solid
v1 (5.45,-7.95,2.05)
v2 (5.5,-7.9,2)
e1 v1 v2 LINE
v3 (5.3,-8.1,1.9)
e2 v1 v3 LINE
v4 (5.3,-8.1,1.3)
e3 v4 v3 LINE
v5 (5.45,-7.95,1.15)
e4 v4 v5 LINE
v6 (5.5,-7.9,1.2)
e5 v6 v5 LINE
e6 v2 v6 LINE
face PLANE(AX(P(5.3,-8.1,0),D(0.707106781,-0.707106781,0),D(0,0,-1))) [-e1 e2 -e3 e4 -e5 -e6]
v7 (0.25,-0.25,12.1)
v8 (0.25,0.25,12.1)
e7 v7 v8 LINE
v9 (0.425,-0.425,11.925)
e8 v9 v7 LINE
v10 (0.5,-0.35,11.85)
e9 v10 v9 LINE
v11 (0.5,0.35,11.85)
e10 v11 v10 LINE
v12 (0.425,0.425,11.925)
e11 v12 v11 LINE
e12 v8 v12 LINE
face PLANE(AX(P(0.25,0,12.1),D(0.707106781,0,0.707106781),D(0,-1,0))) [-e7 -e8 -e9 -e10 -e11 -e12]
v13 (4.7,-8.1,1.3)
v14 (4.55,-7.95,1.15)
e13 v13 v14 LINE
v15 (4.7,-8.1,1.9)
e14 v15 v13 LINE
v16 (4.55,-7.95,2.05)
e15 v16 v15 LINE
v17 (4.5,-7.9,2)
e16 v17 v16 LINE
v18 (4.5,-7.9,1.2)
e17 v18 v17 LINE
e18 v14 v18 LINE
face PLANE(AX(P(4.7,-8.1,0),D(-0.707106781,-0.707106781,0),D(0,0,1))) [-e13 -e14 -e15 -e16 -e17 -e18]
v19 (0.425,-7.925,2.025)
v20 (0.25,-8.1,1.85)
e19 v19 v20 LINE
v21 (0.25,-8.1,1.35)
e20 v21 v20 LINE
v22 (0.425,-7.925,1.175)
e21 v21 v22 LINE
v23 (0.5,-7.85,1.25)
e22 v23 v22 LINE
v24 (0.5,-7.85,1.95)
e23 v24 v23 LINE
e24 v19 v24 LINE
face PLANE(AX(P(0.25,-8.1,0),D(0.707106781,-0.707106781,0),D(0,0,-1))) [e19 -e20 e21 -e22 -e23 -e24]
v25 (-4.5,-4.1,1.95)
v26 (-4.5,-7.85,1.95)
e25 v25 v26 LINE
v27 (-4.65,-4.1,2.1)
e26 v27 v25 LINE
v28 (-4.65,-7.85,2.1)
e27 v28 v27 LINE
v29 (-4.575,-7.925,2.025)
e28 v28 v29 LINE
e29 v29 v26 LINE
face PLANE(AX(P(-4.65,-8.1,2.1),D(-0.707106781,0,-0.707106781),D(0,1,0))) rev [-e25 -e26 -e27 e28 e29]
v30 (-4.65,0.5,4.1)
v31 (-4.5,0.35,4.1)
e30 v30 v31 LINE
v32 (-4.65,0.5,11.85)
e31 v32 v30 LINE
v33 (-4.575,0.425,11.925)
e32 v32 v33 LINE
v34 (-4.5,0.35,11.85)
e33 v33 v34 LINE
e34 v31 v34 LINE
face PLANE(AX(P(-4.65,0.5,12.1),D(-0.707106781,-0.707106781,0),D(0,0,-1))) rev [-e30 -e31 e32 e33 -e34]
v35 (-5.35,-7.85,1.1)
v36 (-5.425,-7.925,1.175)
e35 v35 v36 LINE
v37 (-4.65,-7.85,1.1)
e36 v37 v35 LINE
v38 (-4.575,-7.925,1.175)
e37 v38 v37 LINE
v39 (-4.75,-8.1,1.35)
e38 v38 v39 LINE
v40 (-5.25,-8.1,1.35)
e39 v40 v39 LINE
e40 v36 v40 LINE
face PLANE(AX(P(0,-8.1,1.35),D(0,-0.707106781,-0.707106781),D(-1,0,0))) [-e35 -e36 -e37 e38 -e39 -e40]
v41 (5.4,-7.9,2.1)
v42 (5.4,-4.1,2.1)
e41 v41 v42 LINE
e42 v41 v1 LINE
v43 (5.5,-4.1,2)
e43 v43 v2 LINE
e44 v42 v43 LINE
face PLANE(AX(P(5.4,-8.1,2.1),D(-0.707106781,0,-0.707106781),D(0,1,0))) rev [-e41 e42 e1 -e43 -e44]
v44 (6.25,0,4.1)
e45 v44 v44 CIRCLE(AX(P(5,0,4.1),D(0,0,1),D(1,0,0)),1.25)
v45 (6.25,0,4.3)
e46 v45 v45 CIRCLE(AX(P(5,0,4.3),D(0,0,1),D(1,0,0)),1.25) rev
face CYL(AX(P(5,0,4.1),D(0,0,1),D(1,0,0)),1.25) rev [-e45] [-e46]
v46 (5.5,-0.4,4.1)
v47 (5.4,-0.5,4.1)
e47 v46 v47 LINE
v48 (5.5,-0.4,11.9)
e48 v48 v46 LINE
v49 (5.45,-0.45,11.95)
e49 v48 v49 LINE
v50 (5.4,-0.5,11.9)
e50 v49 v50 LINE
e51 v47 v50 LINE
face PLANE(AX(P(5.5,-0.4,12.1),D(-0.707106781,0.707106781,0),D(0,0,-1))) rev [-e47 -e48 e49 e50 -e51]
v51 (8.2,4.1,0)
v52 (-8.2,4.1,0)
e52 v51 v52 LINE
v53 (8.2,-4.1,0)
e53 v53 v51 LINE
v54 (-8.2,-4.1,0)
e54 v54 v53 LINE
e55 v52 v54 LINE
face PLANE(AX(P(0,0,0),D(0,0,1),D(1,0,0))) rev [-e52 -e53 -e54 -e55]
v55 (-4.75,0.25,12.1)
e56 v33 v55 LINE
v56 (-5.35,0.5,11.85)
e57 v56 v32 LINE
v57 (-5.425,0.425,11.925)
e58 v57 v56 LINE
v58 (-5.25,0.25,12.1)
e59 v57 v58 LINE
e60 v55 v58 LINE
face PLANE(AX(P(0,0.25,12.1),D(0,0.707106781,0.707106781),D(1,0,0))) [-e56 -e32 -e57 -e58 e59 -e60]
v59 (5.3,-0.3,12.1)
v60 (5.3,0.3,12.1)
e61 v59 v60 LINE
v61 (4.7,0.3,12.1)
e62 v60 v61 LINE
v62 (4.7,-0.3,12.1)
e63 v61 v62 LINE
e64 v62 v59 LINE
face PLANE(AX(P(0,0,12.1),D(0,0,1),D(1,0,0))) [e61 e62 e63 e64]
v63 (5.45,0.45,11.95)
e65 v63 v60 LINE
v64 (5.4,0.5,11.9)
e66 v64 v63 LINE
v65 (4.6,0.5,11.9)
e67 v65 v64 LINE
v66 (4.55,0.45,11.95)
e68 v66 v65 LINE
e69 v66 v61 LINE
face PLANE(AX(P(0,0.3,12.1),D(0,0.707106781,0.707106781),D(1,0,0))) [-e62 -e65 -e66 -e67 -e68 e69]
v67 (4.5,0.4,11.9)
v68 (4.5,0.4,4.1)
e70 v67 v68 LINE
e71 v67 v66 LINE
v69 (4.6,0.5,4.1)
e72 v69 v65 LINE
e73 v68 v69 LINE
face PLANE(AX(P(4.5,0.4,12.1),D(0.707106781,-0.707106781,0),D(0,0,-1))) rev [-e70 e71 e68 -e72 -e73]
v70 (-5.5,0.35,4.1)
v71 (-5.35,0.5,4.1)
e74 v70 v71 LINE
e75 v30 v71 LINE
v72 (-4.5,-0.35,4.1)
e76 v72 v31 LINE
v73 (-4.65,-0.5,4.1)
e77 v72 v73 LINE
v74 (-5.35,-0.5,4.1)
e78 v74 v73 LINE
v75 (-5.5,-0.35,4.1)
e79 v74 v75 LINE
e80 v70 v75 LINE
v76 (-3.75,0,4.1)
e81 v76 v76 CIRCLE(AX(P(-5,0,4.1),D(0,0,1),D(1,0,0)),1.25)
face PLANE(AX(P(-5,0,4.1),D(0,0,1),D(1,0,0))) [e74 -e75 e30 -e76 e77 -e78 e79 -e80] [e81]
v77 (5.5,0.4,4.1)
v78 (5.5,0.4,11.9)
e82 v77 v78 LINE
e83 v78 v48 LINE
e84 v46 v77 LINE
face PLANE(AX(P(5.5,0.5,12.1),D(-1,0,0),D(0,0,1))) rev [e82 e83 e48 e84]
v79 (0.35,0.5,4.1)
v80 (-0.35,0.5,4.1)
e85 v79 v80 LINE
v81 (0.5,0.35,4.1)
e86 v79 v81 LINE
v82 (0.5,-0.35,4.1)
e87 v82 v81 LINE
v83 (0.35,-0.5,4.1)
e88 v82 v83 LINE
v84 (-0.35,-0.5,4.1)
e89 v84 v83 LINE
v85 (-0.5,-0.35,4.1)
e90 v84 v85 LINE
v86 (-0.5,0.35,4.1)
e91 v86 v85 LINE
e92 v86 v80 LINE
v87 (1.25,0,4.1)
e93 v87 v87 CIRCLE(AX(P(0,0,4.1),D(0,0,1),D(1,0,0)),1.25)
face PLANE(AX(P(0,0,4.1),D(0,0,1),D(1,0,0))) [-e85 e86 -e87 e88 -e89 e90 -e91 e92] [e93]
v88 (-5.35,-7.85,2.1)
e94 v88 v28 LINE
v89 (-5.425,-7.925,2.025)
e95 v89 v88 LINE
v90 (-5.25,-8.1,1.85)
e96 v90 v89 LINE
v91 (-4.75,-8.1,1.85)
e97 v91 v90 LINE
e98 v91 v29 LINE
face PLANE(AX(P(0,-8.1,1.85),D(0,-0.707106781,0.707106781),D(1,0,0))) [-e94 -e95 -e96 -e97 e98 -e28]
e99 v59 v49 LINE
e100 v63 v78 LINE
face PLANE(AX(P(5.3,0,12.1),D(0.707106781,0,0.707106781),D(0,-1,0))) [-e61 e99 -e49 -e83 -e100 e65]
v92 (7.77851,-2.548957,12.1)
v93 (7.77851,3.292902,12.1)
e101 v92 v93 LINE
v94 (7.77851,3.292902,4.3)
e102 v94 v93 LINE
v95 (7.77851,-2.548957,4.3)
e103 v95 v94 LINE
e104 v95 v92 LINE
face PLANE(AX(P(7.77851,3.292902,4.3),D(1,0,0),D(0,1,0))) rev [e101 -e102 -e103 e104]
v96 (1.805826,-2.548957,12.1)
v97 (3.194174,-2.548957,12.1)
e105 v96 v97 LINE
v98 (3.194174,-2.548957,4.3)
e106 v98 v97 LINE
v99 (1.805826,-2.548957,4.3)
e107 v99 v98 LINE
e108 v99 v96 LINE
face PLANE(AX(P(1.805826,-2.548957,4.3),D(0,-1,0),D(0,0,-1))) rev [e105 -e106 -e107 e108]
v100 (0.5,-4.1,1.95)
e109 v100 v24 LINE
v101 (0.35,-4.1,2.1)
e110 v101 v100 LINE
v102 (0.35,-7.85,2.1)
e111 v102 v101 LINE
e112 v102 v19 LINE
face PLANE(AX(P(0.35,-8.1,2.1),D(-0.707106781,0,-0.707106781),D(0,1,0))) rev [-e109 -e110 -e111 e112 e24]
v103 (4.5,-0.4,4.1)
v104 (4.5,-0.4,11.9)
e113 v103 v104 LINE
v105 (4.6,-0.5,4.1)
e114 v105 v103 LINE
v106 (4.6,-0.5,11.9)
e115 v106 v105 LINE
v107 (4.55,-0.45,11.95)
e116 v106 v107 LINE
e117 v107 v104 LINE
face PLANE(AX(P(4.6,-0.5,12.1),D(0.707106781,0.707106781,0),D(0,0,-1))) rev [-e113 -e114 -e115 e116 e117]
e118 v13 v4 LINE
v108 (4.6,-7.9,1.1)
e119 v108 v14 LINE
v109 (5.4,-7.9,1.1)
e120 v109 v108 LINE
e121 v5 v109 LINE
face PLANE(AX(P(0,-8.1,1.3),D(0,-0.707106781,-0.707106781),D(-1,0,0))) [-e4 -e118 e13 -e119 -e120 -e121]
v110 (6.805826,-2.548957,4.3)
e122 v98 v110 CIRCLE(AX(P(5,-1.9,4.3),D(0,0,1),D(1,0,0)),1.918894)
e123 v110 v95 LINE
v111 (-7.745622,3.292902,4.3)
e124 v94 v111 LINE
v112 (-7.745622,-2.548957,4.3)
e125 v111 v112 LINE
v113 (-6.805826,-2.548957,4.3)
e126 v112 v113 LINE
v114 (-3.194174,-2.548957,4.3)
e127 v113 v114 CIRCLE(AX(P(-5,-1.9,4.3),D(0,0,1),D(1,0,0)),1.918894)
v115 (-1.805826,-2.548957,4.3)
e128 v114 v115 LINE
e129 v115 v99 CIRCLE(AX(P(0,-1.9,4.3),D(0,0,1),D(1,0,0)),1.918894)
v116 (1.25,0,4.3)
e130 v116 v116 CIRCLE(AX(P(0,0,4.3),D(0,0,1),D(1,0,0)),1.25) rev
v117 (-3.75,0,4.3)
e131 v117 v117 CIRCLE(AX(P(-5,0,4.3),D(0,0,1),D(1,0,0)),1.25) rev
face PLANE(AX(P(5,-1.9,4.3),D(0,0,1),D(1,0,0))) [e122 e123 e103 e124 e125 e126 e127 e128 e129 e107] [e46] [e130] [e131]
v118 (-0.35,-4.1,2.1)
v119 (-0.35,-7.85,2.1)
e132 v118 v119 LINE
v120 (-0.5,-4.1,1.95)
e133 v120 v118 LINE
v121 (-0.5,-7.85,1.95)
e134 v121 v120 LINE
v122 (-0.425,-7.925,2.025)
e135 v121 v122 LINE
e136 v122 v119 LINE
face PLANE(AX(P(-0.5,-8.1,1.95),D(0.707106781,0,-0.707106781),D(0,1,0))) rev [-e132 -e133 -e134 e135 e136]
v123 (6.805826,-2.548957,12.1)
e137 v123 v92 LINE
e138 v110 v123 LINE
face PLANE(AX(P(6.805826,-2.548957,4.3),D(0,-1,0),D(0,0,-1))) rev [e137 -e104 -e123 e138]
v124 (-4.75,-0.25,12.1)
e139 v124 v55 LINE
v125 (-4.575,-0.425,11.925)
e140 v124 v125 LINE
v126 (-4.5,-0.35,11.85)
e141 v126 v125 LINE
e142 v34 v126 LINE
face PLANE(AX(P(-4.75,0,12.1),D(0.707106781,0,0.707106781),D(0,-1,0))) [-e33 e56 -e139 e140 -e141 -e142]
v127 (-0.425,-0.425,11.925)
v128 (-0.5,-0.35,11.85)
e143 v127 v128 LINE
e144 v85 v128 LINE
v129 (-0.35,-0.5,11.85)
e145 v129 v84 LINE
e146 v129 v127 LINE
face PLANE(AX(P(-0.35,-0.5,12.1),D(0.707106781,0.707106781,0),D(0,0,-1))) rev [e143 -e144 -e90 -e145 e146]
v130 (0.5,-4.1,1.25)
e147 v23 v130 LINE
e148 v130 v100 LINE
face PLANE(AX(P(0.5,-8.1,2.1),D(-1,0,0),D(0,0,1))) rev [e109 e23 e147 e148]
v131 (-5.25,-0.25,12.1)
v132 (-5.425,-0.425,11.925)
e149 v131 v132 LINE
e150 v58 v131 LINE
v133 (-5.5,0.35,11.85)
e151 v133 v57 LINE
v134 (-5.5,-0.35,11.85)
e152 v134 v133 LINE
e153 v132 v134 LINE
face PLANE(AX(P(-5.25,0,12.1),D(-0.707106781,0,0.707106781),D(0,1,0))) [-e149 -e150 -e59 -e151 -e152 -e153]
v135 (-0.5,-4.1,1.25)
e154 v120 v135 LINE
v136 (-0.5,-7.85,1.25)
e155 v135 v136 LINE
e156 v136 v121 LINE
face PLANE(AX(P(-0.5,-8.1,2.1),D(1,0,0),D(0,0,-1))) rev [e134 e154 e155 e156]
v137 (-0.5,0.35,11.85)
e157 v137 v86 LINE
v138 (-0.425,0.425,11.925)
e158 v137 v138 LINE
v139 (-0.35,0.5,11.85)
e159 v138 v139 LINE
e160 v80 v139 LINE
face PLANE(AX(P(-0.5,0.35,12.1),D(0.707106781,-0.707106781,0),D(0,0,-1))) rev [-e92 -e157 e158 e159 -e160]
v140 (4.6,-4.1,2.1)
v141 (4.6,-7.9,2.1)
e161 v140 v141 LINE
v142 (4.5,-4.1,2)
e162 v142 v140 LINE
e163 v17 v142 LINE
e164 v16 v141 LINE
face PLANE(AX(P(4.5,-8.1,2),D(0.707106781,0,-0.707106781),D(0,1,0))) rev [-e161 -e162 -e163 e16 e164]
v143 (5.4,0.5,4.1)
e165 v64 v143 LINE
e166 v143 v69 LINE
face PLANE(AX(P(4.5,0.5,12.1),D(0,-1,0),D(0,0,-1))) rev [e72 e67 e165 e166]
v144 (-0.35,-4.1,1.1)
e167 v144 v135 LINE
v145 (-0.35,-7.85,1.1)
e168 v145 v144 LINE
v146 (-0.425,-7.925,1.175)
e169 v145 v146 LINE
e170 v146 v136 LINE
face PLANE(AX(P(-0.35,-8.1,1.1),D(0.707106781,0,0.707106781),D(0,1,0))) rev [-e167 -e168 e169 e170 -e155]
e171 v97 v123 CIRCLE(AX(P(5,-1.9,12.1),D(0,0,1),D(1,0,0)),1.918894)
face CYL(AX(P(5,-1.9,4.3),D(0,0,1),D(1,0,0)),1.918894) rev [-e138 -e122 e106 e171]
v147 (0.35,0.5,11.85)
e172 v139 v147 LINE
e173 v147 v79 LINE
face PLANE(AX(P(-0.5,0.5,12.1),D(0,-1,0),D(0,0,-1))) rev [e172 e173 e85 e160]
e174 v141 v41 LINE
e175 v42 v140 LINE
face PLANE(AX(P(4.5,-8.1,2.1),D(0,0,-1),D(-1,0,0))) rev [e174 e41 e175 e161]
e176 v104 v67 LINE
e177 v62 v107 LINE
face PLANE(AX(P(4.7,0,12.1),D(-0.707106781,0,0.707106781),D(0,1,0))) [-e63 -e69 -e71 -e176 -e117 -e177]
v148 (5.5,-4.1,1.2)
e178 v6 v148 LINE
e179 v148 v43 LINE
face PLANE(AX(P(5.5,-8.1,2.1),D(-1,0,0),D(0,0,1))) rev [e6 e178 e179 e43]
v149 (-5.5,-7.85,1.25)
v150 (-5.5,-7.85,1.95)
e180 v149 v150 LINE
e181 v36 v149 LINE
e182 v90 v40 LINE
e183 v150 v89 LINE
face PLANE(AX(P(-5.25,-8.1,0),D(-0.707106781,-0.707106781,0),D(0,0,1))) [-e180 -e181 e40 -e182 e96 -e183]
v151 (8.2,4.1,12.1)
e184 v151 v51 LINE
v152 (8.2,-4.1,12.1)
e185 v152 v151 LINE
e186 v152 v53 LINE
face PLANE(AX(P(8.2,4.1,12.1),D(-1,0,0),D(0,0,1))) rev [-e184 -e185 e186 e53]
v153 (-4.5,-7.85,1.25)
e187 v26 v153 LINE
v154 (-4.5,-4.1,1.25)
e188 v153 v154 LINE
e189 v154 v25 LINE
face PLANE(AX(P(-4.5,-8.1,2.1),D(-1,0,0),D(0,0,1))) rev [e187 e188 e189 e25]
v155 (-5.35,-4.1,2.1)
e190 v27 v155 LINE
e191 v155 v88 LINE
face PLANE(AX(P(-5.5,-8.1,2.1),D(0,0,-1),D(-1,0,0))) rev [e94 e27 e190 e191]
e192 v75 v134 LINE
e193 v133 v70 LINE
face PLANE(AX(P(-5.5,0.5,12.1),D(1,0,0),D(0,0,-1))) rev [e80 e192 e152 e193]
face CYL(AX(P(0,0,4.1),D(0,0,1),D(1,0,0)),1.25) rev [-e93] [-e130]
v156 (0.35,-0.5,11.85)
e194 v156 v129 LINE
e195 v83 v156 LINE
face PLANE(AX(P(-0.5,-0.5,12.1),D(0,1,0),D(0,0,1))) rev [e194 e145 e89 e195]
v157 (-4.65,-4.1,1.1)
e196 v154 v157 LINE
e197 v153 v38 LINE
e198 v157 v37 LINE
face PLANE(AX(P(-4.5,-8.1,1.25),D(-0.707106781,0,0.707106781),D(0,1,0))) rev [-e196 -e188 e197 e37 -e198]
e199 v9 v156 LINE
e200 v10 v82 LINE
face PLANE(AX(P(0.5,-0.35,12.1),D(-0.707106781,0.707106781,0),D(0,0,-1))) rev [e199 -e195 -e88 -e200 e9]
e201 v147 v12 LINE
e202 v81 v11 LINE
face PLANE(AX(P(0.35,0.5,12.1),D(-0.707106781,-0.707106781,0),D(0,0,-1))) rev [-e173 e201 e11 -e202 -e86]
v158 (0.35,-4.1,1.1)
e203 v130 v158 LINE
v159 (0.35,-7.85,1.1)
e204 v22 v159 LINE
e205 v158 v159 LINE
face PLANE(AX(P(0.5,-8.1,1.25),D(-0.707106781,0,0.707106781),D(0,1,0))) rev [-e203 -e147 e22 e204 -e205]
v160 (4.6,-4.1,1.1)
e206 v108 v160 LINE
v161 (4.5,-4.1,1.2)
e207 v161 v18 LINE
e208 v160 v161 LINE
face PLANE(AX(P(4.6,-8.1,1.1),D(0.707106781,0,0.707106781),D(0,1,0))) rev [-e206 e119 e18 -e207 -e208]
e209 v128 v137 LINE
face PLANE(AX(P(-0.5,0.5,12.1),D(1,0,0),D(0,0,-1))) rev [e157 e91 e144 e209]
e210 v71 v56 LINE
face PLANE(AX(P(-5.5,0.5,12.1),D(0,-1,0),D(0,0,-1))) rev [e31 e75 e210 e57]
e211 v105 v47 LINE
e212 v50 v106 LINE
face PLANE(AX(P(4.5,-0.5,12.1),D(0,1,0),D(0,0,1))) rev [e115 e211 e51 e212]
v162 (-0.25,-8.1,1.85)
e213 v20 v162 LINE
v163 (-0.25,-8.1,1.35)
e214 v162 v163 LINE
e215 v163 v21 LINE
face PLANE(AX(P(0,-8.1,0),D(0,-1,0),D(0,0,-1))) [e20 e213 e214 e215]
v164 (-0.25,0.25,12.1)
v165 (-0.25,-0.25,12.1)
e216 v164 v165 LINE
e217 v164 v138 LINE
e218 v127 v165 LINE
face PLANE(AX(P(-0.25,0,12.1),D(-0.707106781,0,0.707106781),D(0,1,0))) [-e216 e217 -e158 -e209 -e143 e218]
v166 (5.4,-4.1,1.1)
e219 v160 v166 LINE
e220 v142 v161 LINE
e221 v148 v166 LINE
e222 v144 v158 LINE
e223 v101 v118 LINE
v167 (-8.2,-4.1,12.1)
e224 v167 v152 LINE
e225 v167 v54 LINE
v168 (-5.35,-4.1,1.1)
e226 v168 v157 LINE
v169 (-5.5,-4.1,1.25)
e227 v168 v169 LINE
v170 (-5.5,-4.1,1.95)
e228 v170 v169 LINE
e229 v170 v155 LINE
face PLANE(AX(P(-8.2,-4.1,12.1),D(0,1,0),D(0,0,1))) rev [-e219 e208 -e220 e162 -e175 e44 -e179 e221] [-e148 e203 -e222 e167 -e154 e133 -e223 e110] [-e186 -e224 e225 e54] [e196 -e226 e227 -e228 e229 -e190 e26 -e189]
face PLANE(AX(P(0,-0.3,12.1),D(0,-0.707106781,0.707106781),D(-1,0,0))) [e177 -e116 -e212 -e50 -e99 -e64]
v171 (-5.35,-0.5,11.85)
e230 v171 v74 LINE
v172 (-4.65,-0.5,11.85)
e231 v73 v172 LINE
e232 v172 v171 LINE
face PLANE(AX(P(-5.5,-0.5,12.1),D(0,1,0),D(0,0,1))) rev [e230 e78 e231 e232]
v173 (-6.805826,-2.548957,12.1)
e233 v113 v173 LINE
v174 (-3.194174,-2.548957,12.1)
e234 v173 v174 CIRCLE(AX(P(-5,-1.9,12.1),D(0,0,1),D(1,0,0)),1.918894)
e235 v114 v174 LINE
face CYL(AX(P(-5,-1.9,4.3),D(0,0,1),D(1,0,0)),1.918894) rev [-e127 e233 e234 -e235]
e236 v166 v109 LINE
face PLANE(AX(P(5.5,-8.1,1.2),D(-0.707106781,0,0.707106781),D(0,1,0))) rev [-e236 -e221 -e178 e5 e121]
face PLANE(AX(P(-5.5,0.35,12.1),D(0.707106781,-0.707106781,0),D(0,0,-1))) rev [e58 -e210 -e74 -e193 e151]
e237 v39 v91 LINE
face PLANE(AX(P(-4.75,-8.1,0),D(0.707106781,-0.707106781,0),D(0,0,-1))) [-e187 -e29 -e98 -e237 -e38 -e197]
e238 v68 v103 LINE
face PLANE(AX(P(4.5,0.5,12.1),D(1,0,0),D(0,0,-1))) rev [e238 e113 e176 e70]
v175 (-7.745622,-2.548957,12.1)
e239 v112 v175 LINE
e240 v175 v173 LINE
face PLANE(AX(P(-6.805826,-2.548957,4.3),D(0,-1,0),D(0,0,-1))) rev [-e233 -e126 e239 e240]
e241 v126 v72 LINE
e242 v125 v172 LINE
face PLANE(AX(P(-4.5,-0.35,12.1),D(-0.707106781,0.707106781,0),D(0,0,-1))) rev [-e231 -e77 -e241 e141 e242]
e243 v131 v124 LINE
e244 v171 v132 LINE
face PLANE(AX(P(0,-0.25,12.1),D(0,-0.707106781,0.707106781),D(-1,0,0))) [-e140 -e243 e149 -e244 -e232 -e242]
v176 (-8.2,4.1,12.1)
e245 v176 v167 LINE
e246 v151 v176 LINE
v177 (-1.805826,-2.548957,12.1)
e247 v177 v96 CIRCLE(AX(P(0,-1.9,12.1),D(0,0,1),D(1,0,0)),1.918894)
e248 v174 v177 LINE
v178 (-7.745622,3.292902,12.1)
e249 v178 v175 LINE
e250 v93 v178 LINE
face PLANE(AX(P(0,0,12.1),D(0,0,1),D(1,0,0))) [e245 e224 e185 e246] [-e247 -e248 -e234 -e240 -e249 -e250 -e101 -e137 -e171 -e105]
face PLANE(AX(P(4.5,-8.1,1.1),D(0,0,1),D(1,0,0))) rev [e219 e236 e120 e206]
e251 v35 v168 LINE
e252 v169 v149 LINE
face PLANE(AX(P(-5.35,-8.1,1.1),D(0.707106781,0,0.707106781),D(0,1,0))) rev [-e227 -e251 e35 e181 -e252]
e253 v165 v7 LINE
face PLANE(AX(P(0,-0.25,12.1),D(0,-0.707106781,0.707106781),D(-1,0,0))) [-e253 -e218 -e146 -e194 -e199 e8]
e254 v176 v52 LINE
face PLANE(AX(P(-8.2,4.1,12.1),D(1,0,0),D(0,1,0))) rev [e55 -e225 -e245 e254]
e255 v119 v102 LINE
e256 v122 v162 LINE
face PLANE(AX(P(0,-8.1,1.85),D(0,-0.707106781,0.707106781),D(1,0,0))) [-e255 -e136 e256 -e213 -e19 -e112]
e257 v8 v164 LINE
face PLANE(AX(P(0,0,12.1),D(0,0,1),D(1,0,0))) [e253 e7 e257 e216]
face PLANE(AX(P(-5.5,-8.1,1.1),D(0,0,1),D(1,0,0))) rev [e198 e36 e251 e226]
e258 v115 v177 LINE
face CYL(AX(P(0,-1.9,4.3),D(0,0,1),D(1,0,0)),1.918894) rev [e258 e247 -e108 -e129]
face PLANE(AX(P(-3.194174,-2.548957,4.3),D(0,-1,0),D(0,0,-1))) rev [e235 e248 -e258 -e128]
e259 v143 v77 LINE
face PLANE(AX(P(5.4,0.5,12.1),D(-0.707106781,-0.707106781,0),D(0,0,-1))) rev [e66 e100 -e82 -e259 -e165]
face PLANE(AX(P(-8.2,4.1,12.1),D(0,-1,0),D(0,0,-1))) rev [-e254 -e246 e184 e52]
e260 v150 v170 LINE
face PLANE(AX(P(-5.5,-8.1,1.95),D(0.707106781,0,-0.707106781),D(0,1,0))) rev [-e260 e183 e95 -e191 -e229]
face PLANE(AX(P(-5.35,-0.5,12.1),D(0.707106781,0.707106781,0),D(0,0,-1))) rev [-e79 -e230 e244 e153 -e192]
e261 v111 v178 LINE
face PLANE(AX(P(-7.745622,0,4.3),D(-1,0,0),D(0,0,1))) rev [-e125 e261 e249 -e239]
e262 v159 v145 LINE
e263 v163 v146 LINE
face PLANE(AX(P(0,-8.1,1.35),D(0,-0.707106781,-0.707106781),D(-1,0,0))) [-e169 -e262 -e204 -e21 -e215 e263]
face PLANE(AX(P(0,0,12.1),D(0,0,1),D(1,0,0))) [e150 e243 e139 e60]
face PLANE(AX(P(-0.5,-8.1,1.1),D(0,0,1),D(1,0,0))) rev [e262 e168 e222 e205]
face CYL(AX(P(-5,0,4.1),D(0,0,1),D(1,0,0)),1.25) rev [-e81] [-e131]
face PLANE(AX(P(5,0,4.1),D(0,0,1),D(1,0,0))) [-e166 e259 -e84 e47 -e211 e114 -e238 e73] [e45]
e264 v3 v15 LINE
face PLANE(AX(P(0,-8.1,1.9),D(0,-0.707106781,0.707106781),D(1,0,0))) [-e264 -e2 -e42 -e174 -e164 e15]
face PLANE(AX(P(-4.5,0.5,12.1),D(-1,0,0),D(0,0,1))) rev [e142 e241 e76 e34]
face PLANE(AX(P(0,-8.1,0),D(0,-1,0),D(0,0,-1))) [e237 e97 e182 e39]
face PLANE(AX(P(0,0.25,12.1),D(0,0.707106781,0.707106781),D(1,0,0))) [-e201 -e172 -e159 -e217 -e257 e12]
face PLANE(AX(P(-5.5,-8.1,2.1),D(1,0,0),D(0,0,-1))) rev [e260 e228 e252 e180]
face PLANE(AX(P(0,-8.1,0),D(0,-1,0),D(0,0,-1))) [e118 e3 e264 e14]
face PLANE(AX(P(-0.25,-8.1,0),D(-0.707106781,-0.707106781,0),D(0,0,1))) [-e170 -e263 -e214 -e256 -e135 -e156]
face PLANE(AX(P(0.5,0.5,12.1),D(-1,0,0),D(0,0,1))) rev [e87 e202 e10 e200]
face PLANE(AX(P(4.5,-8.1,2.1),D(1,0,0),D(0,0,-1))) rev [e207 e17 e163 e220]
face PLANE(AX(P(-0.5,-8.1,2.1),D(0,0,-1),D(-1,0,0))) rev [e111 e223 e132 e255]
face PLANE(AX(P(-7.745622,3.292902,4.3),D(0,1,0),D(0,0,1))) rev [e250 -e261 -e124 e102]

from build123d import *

# Parameters (mm, degrees)
SKETCH_1_W          = 16.4
SKETCH_1_H          = 8.2
EXTRUDE_1_DEPTH     = 12.1
SKETCH_4_R          = 1.25
CUT_EXTRUDE_3_DEPTH = 8
CUT_EXTRUDE_4_DEPTH = 7.8
SKETCH_7_W          = 1
SKETCH_7_H          = 1
EXTRUDE_2_DEPTH     = 8
CHAMFER_1_SIZE      = 0.15
CHAMFER_2_SIZE      = 0.25
SKETCH_8_W          = 1
SKETCH_8_H          = 1
EXTRUDE_3_DEPTH     = 4
CHAMFER_3_SIZE      = 0.15
CHAMFER_4_SIZE      = 0.25
CHAMFER_6_SIZE      = 0.1
CHAMFER_7_SIZE      = 0.2
CHAMFER_8_SIZE      = 0.1
CHAMFER_9_SIZE      = 0.2


with BuildPart() as part:
    # Эскиз1 → Бобышка-Вытянуть1 (new body)
    with BuildSketch(Plane.XY):
        Rectangle(SKETCH_1_W, SKETCH_1_H)
    extrude(amount=EXTRUDE_1_DEPTH)

    # Эскиз4 → Вырез-Вытянуть3 (cut)
    with BuildSketch(Plane.XY.offset(12.1)):
        with Locations((-5, 0)):
            Circle(SKETCH_4_R)
        Circle(SKETCH_4_R)
        with Locations((5, 0)):
            Circle(SKETCH_4_R)
    extrude(amount=-CUT_EXTRUDE_3_DEPTH, mode=Mode.SUBTRACT)

    # Эскиз5 → Вырез-Вытянуть4 (cut)
    with BuildSketch(Plane.XY.offset(12.1)):
        with BuildLine():
            Line((-7.745621634, 0), (-7.745621634, 3.292901982))
            Line((-7.745621634, 3.292901982), (2.778509544, 3.292901982))
            Line((2.778509544, 3.292901982), (7.778509544, 3.292901982))
            Line((7.778509544, 3.292901982), (7.778509544, -2.548957219))
            Line((7.778509544, -2.548957219), (6.80582632, -2.548957219))
            ThreePointArc((6.80582632, -2.548957219), (5, -3.818893996), (3.19417368, -2.548957219))
            Line((3.19417368, -2.548957219), (1.80582632, -2.548957219))
            ThreePointArc((1.80582632, -2.548957219), (0, -3.818893996), (-1.80582632, -2.548957219))
            Line((-1.80582632, -2.548957219), (-3.19417368, -2.548957219))
            ThreePointArc((-3.19417368, -2.548957219), (-5, -3.818893996), (-6.80582632, -2.548957219))
            Line((-6.80582632, -2.548957219), (-7.745621634, -2.548957219))
            Line((-7.745621634, -2.548957219), (-7.745621634, 0))
        make_face()
    extrude(amount=-CUT_EXTRUDE_4_DEPTH, mode=Mode.SUBTRACT)

    # Эскиз7 → Бобышка-Вытянуть2 (add)
    with BuildSketch(Plane.XY.offset(4.1)):
        Rectangle(SKETCH_7_W, SKETCH_7_H)
        with Locations((-5, 0)):
            Rectangle(SKETCH_7_W, SKETCH_7_H)
        with Locations((5, 0)):
            Rectangle(SKETCH_7_W, SKETCH_7_H)
    extrude(amount=EXTRUDE_2_DEPTH)

    # Фаска1
    chamfer_1_edges = [part.edges().sort_by_distance(p)[0] for p in [
        (-4.5, -0.5, 8.1),
        (-4.5, 0.5, 8.1),
        (-5.5, 0.5, 8.1),
        (-5.5, -0.5, 8.1),
        (0.5, -0.5, 8.1),
        (0.5, 0.5, 8.1),
        (-0.5, 0.5, 8.1),
        (-0.5, -0.5, 8.1),
    ]]
    chamfer(chamfer_1_edges, length=CHAMFER_1_SIZE)

    # Фаска2
    # the kernel refuses this chamfer: 0.25 mm, written as the material it takes off along each edge
    with BuildSketch(Plane(origin=(-0.5, -0.992920747, 12.1), x_dir=(-0.027495876610586414, 0, -0.9996219169112968), z_dir=(0, 1, 0)), Plane(origin=(-0.992920747, 0.5, 12.1), x_dir=(0, 0.027495876610586414, -0.9996219169112968), z_dir=(1, 0, 0)), Plane(origin=(0.5, 0.992920747, 12.1), x_dir=(0.027495876610586414, 0, -0.9996219169112968), z_dir=(0, -1, 0)), Plane(origin=(0.992920747, -0.5, 12.1), x_dir=(0, -0.027495876610586414, -0.9996219169112968), z_dir=(-1, 0, 0)), Plane(origin=(-4.5, 0.992920747, 12.1), x_dir=(0.02749587661058555, 0, -0.9996219169112968), z_dir=(0, -1, 0)), Plane(origin=(-4.007079253, -0.5, 12.1), x_dir=(0, -0.027495876610586414, -0.9996219169112968), z_dir=(-1, 0, 0)), Plane(origin=(-5.5, -0.992920747, 12.1), x_dir=(-0.02749587661058555, 0, -0.9996219169112968), z_dir=(0, 1, 0)), Plane(origin=(-5.992920747, 0.5, 12.1), x_dir=(0, 0.027495876610586414, -0.9996219169112968), z_dir=(1, 0, 0))) as chamfer_2_piece_1:
        Polygon((CHAMFER_2_SIZE * 0.999621916911, -CHAMFER_2_SIZE * 0.0274958766106), (-CHAMFER_2_SIZE * 0.0274958766106, -CHAMFER_2_SIZE * 0.999621916911), (0, 0), align=None)
    extrude(amount=1.985841494, mode=Mode.SUBTRACT)

    # Эскиз8 → Бобышка-Вытянуть3 (add)
    with BuildSketch(Plane(origin=(0, -4.1, 0), x_dir=(-1, 0, 0), z_dir=(0, -1, 0))):
        with Locations((0, -1.6)):
            Rectangle(SKETCH_8_W, SKETCH_8_H)
        with Locations((5, -1.6)):
            Rectangle(SKETCH_8_W, SKETCH_8_H)
        with Locations((-5, -1.6)):
            Rectangle(SKETCH_8_W, SKETCH_8_H)
    extrude(amount=EXTRUDE_3_DEPTH)

    # Фаска3
    chamfer_3_edges = [part.edges().sort_by_distance(p)[0] for p in [
        (-4.5, -6.1, 1.1),
        (-4.5, -6.1, 2.1),
        (-5.5, -6.1, 2.1),
        (-5.5, -6.1, 1.1),
        (0.5, -6.1, 1.1),
        (0.5, -6.1, 2.1),
        (-0.5, -6.1, 2.1),
        (-0.5, -6.1, 1.1),
    ]]
    chamfer(chamfer_3_edges, length=CHAMFER_3_SIZE)

    # Фаска4
    # the kernel refuses this chamfer: 0.25 mm, written as the material it takes off along each edge
    with BuildSketch(Plane(origin=(0.5, -8.1, 2.592920747), x_dir=(0.02749587661058651, 0.9996219169112968, 0), z_dir=(0, 0, -1)), Plane(origin=(-0.5, -8.1, 0.607079253), x_dir=(-0.02749587661058651, 0.9996219169112968, 0), z_dir=(0, 0, 1)), Plane(origin=(-0.992920747, -8.1, 2.1), x_dir=(0, 0.9996219169112968, 0.027495876610585647), z_dir=(1, 0, 0)), Plane(origin=(0.992920747, -8.1, 1.1), x_dir=(0, 0.9996219169112968, -0.02749587661058651), z_dir=(-1, 0, 0)), Plane(origin=(-5.5, -8.1, 0.607079253), x_dir=(-0.027495876610585647, 0.9996219169112968, 0), z_dir=(0, 0, 1)), Plane(origin=(-5.992920747, -8.1, 2.1), x_dir=(0, 0.9996219169112968, 0.027495876610585647), z_dir=(1, 0, 0)), Plane(origin=(-4.5, -8.1, 2.592920747), x_dir=(0.027495876610585647, 0.9996219169112968, 0), z_dir=(0, 0, -1)), Plane(origin=(-4.007079253, -8.1, 1.1), x_dir=(0, 0.9996219169112968, -0.02749587661058651), z_dir=(-1, 0, 0))) as chamfer_4_piece_1:
        Polygon((CHAMFER_4_SIZE * 0.999621916911, -CHAMFER_4_SIZE * 0.0274958766106), (-CHAMFER_4_SIZE * 0.0274958766106, -CHAMFER_4_SIZE * 0.999621916911), (0, 0), align=None)
    extrude(amount=1.985841494, mode=Mode.SUBTRACT)

    # Фаска6
    chamfer_6_edges = [part.edges().sort_by_distance(p)[0] for p in [
        (5.5, -0.5, 8.1),
        (5.5, 0.5, 8.1),
        (4.5, 0.5, 8.1),
        (4.5, -0.5, 8.1),
    ]]
    chamfer(chamfer_6_edges, length=CHAMFER_6_SIZE)

    # Фаска7
    # the kernel refuses this chamfer: 0.2 mm, written as the material it takes off along each edge
    with BuildSketch(Plane(origin=(5.5, 0.914336598, 12.1), x_dir=(0.02749587661058742, 0, -0.9996219169112966), z_dir=(0, -1, 0)), Plane(origin=(5.914336598, -0.5, 12.1), x_dir=(0, -0.02749587661058634, -0.9996219169112966), z_dir=(-1, 0, 0)), Plane(origin=(4.5, -0.914336598, 12.1), x_dir=(-0.02749587661058742, 0, -0.9996219169112966), z_dir=(0, 1, 0)), Plane(origin=(4.085663402, 0.5, 12.1), x_dir=(0, 0.02749587661058634, -0.9996219169112966), z_dir=(1, 0, 0))) as chamfer_7_piece_1:
        Polygon((CHAMFER_7_SIZE * 0.999621916911, -CHAMFER_7_SIZE * 0.0274958766106), (-CHAMFER_7_SIZE * 0.0274958766106, -CHAMFER_7_SIZE * 0.999621916911), (0, 0), align=None)
    extrude(amount=1.828673195, mode=Mode.SUBTRACT)

    # Фаска8
    chamfer_8_edges = [part.edges().sort_by_distance(p)[0] for p in [
        (5.5, -6.1, 1.1),
        (5.5, -6.1, 2.1),
        (4.5, -6.1, 2.1),
        (4.5, -6.1, 1.1),
    ]]
    chamfer(chamfer_8_edges, length=CHAMFER_8_SIZE)

    # Фаска9
    # the kernel refuses this chamfer: 0.2 mm, written as the material it takes off along each edge
    with BuildSketch(Plane(origin=(5.5, -8.1, 2.514336598), x_dir=(0.027495876610587302, 0.9996219169112966, 0), z_dir=(0, 0, -1)), Plane(origin=(5.914336598, -8.1, 1.1), x_dir=(0, 0.9996219169112968, -0.027495876610586226), z_dir=(-1, 0, 0)), Plane(origin=(4.5, -8.1, 0.685663402), x_dir=(-0.027495876610587302, 0.9996219169112966, 0), z_dir=(0, 0, 1)), Plane(origin=(4.085663402, -8.1, 2.1), x_dir=(0, 0.9996219169112966, 0.027495876610587302), z_dir=(1, 0, 0))) as chamfer_9_piece_1:
        Polygon((CHAMFER_9_SIZE * 0.999621916911, -CHAMFER_9_SIZE * 0.0274958766106), (-CHAMFER_9_SIZE * 0.0274958766106, -CHAMFER_9_SIZE * 0.999621916911), (0, 0), align=None)
    extrude(amount=1.828673195, mode=Mode.SUBTRACT)


solid = part.part
